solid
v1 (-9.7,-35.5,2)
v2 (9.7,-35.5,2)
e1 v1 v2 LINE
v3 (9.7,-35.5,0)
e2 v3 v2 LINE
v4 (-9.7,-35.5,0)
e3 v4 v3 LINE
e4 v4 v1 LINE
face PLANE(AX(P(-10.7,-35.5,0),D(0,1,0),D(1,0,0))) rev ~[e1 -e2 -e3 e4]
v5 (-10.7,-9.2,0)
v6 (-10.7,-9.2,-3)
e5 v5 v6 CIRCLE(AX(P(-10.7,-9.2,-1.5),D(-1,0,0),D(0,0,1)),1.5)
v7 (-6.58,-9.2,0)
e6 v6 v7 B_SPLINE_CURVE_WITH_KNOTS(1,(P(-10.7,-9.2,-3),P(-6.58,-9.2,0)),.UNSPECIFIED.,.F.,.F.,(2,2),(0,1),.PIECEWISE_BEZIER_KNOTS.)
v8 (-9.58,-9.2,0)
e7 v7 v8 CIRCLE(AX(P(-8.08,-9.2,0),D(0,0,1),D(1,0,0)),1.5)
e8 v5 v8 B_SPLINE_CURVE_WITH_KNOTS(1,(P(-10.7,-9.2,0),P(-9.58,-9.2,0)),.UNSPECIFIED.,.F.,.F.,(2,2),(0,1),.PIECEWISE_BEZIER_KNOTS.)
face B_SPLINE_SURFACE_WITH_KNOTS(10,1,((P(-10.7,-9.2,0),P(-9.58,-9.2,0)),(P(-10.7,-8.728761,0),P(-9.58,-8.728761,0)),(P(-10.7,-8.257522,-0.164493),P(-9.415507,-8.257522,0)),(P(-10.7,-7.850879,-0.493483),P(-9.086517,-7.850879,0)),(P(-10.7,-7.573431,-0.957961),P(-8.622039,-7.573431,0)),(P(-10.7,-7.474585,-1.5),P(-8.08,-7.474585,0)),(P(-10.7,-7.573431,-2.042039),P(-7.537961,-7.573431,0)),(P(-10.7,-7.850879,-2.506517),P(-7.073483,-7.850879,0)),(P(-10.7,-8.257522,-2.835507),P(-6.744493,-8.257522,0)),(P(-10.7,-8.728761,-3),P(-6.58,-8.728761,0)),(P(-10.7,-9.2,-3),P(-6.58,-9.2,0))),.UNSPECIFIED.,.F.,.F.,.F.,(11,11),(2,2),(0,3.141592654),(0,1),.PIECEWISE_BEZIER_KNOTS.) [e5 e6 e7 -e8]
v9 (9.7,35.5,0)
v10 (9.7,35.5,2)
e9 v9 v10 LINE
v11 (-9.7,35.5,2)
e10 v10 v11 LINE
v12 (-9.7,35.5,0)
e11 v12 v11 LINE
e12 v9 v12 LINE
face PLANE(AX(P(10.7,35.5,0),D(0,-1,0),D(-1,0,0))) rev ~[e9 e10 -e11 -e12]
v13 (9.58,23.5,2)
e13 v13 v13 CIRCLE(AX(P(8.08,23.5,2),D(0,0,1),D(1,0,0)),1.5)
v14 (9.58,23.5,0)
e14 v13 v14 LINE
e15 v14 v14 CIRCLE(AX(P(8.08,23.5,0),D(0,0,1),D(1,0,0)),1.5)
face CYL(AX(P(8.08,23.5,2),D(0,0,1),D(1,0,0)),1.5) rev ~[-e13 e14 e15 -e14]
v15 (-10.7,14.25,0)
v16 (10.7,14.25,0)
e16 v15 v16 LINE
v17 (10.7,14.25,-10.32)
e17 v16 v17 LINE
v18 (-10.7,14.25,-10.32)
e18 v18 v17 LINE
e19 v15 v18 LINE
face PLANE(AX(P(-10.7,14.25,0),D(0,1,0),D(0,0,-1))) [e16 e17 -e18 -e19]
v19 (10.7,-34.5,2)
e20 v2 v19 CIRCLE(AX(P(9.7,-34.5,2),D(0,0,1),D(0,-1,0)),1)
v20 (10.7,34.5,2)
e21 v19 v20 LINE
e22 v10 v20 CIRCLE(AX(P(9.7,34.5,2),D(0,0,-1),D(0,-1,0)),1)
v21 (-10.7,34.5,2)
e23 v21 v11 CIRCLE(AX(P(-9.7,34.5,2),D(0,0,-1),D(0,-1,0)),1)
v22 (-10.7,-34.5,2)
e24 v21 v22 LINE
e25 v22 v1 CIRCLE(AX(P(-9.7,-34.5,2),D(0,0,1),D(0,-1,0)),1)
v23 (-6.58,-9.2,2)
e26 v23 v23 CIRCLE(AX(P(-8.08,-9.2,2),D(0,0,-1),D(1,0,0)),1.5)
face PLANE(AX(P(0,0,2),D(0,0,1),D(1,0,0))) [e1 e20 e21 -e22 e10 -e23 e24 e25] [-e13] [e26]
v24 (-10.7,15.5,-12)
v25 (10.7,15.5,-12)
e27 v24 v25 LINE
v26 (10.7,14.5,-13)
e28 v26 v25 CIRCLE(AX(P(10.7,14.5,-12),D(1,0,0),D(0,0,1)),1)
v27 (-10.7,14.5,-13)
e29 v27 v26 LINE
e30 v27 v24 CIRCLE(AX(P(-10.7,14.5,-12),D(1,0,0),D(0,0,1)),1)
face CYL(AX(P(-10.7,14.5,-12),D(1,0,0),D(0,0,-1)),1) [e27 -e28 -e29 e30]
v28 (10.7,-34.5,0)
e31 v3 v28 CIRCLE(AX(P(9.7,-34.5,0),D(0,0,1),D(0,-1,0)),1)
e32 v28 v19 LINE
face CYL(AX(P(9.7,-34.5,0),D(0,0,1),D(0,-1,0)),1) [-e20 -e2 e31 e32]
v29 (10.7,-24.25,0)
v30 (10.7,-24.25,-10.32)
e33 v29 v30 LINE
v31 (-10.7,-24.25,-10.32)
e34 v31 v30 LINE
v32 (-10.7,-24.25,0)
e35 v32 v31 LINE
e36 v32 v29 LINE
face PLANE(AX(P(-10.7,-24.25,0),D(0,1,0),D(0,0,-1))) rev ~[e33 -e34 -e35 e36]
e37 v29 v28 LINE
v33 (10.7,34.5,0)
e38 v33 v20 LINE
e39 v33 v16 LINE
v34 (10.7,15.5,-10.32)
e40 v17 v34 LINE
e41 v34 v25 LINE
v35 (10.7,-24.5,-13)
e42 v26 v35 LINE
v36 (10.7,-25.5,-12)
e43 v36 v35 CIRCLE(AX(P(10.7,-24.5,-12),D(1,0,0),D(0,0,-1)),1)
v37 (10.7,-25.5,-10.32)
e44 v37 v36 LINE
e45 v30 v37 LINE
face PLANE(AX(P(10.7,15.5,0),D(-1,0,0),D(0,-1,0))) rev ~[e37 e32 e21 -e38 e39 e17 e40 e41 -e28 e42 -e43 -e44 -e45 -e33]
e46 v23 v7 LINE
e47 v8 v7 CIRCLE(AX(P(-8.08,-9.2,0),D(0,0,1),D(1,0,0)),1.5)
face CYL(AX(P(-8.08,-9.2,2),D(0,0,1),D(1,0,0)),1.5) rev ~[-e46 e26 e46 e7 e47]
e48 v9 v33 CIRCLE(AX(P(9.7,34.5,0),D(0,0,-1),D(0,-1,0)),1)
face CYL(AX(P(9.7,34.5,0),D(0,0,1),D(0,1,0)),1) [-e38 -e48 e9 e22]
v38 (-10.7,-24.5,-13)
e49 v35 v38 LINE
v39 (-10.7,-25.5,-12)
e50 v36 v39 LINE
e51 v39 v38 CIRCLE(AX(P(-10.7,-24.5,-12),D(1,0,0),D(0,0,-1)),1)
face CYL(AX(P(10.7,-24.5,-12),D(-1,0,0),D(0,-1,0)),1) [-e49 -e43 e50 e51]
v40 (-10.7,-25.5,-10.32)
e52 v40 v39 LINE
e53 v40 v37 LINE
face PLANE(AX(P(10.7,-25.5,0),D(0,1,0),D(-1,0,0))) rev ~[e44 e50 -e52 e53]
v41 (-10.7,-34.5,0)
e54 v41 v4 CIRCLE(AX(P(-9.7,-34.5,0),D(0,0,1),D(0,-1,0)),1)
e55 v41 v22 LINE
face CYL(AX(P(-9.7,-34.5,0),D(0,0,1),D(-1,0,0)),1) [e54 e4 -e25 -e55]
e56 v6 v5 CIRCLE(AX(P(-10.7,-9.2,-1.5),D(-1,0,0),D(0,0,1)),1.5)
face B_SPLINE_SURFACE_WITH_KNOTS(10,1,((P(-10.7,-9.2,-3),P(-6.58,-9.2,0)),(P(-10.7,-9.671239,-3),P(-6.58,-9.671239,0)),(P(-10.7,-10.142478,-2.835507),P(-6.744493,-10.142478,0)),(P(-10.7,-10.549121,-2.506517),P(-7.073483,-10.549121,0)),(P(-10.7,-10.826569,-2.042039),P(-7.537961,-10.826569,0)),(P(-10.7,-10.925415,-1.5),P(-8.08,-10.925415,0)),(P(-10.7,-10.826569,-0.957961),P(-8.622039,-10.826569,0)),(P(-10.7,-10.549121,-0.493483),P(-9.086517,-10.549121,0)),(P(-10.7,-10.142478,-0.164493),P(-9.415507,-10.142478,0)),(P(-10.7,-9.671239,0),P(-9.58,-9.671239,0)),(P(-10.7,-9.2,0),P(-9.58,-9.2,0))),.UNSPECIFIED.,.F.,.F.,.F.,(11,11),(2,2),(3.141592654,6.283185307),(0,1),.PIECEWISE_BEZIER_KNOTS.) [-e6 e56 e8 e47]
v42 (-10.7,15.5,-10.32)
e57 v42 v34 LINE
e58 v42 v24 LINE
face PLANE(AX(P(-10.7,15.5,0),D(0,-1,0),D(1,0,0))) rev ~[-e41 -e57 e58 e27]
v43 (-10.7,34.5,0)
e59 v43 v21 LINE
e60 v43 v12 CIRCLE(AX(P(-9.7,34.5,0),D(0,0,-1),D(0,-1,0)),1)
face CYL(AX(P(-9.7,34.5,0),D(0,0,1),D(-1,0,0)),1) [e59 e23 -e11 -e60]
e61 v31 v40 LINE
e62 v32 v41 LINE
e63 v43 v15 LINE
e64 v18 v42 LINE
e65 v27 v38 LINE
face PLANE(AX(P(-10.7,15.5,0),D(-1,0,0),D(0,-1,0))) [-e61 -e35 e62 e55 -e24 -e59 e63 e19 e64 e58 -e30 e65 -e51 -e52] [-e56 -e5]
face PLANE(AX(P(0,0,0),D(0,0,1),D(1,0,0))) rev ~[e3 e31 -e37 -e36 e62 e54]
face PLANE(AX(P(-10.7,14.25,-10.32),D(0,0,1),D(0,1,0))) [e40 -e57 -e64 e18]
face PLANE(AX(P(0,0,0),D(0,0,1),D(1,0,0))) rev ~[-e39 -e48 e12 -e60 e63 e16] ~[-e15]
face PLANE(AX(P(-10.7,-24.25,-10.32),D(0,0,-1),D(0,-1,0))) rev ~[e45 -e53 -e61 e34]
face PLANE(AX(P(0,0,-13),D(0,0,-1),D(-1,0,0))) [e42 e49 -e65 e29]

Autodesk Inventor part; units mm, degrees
ref_plane "YZ Plane" through (0, 0, 0) normal (1, 0, 0) x (0, 1, 0)
ref_plane "XZ Plane" through (0, 0, 0) normal (0, 1, 0) x (-1, 0, 0)
ref_plane "XY Plane" through (0, 0, 0) normal (0, 0, 1) x (1, 0, 0)
sketch "Skizze1" plane through (0, 0, 0) normal (0, 0, 1) x (1, 0, 0)
  line L0 (-10.7, -35.5) -> (10.7, -35.5)
  line L1 (10.7, -35.5) -> (10.7, 35.5)
  line L2 (10.7, 35.5) -> (-10.7, 35.5)
  line L3 (-10.7, 35.5) -> (-10.7, -35.5)
  line L4 (-10.7, -35.5) -> (10.7, 35.5) construction
  line L5 (10.7, -35.5) -> (-10.7, 35.5) construction
  point P0 (0, 0)
  dimension "d0" = 21.4
  dimension "d1" = 71
extrude "Extrusion1" add sketch "Skizze1" along normal blind 2
sketch "Skizze2" plane through (0, 0, 2) normal (0, 0, 1) x (1, 0, 0)
  line L0 (10.7, 35.5) -> (-10.7, 35.5) projected
  line L1 (0, 35.5) -> (0, 32.4568) construction
  line L2 (-3.3034, 0) -> (2.2681, 0) construction
  line L3 (-10.7, 35.5) -> (-10.7, -35.5) construction
  circle A0 centre (8.08, 23.5) radius 1.5
  circle A1 centre (-8.08, -9.2) radius 1.5
  line L4 (9.58, 23.5) -> (10.7, 23.5)
  line L5 (10.7, -35.5) -> (10.7, 35.5) projected
  line L6 (-9.58, -9.2) -> (-10.7, -9.2)
  point P0 (0, 0)
  point P1 (10.14, 23.5)
  point P2 (-10.14, -9.2)
  dimension "d18" = 3
  dimension "d19" = 3
  dimension "d21" = 1.12
  dimension "d22" = 1.12
  dimension "d23" = 32.7
  dimension "d24" = 12
extrude "Extrusion2" cut sketch "Skizze2" against normal blind 4
sketch "Skizze3" plane through (0, 0, 0) normal (0, 0, -1) x (-1, 0, 0)
  line L0 (10.7, 35.5) -> (10.7, -35.5) projected
  line L1 (-10.7, -25.5) -> (10.7, -25.5)
  line L2 (10.7, -25.5) -> (10.7, 15.5)
  line L3 (10.7, 15.5) -> (-10.7, 15.5)
  line L4 (-10.7, 15.5) -> (-10.7, -25.5)
  line L5 (-10.7, -25.5) -> (10.7, 15.5) construction
  line L6 (10.7, -25.5) -> (-10.7, 15.5) construction
  line L7 (10.7, -35.5) -> (-10.7, -35.5) projected
  line L8 (-10.7, -35.5) -> (-10.7, 35.5) projected
  point P0 (0, -5)
  point P1 (10.7, -25.5)
  dimension "d9" = 41
  dimension "d17" = 10
extrude "Extrusion3" add sketch "Skizze3" along normal blind 13 contours L0 L1 L4 L3
sketch "Skizze4" plane through (-10.7, -35.5, 2) normal (-1, 0, 0) x (0, 0, 1)
  line L0 (-2, 10) -> (-15, 10) projected
  line L1 (-12.32, 10) -> (-2, 10)
  line L2 (-2, 10) -> (-2, 11.25)
  line L3 (-2, 11.25) -> (-12.32, 11.25)
  line L4 (-12.32, 11.25) -> (-12.32, 10)
  line L5 (-15, 10) -> (-15, 51) projected
  line L6 (-4.404, 30.5) -> (2.981, 30.5) construction
  line L7 (-2, 51) -> (-15, 51)
  line L8 (-2, 51) -> (-2, 49.75)
  line L9 (-2, 49.75) -> (-12.32, 49.75)
  line L10 (-12.32, 49.75) -> (-12.32, 51)
  line L11 (-2, 10) -> (-12.32, 10)
  point P0 (-2, 35.5)
  point P1 (-12.32, 10.625)
  dimension "d12" = 2.68
  dimension "d13" = 1.25
extrude "Extrusion4" cut sketch "Skizze4" against normal through all
fillet "Rundung1" radius 1 6 edges at (-10.7, -35.5, 1) (10.7, -35.5, 1) (10.7, 35.5, 1) (-10.7, 35.5, 1) (0, 15.5, -13) (0, -25.5, -13)
sketch "Skizze5" plane through (-10.7, -24.25, -10.32) normal (-1, 0, 0) x (0, 0, 1)
  line L0 (12.32, 16.55) -> (12.32, 13.55) projected
  line L1 (10.32, 13.55) -> (10.32, 16.55) projected
  line L2 (10.32, 13.55) -> (10.32, 16.55) projected
  line L3 (12.32, 16.55) -> (12.32, 13.55) projected
  circle A0 centre (8.82, 15.05) radius 1.5
  point P0 (10.32, 24.25)
  point P1 (10.32, 15.05)
  dimension "d25" = 3
loft "Erhebung2" cut profiles "Skizze5" section 2 edges at (-9.58, -9.2, 0)
properties part number "Relais_Platte_3D-Druck"
